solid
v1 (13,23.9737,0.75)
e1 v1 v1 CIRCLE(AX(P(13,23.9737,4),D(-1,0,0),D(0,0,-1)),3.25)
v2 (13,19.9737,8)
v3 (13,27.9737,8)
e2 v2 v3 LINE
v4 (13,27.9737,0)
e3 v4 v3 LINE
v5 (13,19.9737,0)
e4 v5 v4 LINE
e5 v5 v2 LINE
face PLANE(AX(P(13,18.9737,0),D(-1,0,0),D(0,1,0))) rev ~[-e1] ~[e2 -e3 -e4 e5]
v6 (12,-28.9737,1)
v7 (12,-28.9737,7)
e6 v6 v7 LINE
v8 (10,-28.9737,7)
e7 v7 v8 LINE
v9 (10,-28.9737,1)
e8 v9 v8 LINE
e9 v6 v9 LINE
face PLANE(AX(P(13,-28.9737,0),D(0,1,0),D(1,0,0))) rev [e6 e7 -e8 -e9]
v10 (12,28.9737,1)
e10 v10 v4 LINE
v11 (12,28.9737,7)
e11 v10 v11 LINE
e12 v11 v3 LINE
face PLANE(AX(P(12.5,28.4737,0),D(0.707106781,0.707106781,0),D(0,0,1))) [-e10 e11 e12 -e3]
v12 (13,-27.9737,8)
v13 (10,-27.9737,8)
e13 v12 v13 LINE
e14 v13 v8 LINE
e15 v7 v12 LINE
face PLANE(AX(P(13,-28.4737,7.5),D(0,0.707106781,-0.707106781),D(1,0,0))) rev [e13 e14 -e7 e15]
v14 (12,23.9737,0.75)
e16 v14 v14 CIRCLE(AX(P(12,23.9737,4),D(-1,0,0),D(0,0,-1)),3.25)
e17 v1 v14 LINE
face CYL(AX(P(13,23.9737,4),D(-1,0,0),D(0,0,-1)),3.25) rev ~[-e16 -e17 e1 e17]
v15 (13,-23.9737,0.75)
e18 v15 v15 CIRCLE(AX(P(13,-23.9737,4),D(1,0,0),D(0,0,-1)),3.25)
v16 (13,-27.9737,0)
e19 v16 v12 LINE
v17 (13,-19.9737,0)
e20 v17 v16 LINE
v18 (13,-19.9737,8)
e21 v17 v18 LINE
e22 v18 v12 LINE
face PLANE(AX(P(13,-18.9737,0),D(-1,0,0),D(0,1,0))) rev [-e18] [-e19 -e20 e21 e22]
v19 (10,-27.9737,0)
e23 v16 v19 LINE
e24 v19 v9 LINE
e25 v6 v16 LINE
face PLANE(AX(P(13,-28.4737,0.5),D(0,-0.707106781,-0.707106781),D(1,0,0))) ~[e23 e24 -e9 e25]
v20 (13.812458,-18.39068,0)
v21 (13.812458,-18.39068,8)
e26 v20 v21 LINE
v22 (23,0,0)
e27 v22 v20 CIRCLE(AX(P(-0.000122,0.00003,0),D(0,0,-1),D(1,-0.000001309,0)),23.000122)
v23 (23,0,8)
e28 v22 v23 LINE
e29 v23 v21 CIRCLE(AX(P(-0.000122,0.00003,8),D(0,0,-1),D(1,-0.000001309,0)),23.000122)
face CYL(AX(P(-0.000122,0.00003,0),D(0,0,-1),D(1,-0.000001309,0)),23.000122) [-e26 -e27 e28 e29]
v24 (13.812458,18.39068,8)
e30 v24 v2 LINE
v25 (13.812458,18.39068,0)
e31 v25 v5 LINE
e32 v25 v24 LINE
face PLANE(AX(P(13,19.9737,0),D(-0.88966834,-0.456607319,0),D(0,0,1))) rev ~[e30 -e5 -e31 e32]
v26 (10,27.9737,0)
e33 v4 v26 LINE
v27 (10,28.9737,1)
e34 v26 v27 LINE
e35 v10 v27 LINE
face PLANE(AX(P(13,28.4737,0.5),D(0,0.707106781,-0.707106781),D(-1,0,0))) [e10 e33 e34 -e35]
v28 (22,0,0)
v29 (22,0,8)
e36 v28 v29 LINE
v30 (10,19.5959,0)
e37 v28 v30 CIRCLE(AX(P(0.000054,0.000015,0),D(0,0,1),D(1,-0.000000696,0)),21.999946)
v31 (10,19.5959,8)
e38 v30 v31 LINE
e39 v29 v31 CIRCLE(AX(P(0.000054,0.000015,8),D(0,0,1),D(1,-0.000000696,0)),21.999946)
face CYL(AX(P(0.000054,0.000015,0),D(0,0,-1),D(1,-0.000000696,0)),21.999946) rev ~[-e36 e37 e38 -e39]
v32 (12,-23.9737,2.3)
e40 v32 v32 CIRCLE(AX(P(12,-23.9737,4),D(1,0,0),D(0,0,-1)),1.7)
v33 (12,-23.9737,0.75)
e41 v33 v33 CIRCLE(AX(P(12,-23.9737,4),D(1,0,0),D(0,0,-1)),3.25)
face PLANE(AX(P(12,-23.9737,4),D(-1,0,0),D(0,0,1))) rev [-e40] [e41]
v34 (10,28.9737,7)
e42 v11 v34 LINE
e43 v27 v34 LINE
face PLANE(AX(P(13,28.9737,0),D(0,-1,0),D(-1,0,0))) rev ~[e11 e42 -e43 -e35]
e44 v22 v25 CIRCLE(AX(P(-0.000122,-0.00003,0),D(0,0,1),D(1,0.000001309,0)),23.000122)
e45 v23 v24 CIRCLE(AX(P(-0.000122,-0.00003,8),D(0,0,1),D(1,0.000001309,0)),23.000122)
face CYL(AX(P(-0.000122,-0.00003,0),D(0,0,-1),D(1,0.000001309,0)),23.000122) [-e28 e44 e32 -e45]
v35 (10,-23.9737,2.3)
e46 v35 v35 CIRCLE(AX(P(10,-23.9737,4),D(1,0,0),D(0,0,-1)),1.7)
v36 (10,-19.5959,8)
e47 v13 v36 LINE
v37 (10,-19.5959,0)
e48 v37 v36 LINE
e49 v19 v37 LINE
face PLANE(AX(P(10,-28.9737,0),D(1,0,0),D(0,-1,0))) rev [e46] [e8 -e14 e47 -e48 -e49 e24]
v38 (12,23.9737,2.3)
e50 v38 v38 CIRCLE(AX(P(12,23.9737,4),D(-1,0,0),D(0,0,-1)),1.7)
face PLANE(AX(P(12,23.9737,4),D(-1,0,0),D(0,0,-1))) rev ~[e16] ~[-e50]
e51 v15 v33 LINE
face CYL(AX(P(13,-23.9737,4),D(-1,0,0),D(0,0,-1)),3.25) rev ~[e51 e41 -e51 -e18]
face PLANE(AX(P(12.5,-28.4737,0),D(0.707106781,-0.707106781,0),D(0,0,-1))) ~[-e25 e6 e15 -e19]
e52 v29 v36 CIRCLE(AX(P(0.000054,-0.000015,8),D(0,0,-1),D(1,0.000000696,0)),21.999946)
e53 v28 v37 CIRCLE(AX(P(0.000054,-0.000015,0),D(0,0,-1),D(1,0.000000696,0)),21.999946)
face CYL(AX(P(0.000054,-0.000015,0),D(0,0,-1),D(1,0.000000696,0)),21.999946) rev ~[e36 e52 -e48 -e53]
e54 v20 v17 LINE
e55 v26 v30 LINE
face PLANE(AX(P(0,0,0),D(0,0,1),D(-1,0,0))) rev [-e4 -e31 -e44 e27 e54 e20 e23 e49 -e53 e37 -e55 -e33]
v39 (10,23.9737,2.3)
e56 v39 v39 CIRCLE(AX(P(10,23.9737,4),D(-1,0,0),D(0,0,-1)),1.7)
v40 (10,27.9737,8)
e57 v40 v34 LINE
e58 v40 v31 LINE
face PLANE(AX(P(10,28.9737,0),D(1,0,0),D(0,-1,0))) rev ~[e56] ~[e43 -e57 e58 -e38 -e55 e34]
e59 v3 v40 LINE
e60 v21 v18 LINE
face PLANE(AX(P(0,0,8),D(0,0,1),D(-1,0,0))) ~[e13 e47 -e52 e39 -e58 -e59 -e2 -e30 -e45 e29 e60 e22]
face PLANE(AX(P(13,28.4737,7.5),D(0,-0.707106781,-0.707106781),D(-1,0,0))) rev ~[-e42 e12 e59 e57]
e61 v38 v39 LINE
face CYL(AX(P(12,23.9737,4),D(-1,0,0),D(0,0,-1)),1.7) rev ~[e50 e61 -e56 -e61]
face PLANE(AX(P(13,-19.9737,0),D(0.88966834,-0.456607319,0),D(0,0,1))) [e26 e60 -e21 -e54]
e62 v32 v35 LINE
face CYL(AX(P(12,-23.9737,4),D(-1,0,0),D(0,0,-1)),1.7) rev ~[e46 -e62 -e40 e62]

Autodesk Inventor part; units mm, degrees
ref_plane "YZ Plane" through (0, 0, 0) normal (1, 0, 0) x (0, 1, 0)
ref_plane "XZ Plane" through (0, 0, 0) normal (0, 1, 0) x (-1, 0, 0)
ref_plane "XY Plane" through (0, 0, 0) normal (0, 0, 1) x (1, 0, 0)
sketch "Esquisse1" plane through (0, 0, 0) normal (0, 0, 1) x (1, 0, 0)
  arc A0 (22, 0) -> (10, 19.5959) centre (0, 0) ccw
  arc A1 (23, 0) -> (13, 18.9737) centre (0, 0) ccw
  line L0 (13, 18.9737) -> (13, 28.9737)
  line L1 (13, 28.9737) -> (10, 28.9737)
  line L2 (10, 28.9737) -> (10, 19.5959)
  line L3 (23, 0) -> (22, 0)
  dimension "d0" = 1
  dimension "d1" = 22
  dimension "d2" = 10
  dimension "d3" = 3
  dimension "d4" = 10
extrude "Extrusion1" add sketch "Esquisse1" along normal blind 8
sketch "Esquisse2" plane through (13, 18.9737, 0) normal (1, 0, 0) x (0, 0, -1)
  line L0 (0, 0) -> (0, 10) projected
  line L1 (0, 10) -> (-8, 10) projected
  line L2 (-8, 0) -> (-8, 10) projected
  line L3 (0, 0) -> (-8, 0) projected
  point P0 (0, -18.9737)
  point P1 (-4, 5)
  point P2 (0, 5)
  point P3 (-4, 10)
hole "Perçage1" at (13, 23.9737, 4) direction (-1, 0, 0) diameter 3.4 depth 3 counterbore diameter 6.5 counterbore depth 1 clearance for "Vis d'assemblage à six pans creux ISO 4762" size "M3" standard "ISO"
chamfer "Chanfrein1" distance 1 angle 45 4 edges at (13, 28.9737, 4) (11.5, 28.9737, 8) (11.5, 28.9737, 0) (13, 18.9737, 4)
mirror "Symétrie1" about plane through (22, 0, 0) normal (0, -1, 0) of "Extrusion1", "Perçage1", "Chanfrein1"
properties part number "guide_attache"
